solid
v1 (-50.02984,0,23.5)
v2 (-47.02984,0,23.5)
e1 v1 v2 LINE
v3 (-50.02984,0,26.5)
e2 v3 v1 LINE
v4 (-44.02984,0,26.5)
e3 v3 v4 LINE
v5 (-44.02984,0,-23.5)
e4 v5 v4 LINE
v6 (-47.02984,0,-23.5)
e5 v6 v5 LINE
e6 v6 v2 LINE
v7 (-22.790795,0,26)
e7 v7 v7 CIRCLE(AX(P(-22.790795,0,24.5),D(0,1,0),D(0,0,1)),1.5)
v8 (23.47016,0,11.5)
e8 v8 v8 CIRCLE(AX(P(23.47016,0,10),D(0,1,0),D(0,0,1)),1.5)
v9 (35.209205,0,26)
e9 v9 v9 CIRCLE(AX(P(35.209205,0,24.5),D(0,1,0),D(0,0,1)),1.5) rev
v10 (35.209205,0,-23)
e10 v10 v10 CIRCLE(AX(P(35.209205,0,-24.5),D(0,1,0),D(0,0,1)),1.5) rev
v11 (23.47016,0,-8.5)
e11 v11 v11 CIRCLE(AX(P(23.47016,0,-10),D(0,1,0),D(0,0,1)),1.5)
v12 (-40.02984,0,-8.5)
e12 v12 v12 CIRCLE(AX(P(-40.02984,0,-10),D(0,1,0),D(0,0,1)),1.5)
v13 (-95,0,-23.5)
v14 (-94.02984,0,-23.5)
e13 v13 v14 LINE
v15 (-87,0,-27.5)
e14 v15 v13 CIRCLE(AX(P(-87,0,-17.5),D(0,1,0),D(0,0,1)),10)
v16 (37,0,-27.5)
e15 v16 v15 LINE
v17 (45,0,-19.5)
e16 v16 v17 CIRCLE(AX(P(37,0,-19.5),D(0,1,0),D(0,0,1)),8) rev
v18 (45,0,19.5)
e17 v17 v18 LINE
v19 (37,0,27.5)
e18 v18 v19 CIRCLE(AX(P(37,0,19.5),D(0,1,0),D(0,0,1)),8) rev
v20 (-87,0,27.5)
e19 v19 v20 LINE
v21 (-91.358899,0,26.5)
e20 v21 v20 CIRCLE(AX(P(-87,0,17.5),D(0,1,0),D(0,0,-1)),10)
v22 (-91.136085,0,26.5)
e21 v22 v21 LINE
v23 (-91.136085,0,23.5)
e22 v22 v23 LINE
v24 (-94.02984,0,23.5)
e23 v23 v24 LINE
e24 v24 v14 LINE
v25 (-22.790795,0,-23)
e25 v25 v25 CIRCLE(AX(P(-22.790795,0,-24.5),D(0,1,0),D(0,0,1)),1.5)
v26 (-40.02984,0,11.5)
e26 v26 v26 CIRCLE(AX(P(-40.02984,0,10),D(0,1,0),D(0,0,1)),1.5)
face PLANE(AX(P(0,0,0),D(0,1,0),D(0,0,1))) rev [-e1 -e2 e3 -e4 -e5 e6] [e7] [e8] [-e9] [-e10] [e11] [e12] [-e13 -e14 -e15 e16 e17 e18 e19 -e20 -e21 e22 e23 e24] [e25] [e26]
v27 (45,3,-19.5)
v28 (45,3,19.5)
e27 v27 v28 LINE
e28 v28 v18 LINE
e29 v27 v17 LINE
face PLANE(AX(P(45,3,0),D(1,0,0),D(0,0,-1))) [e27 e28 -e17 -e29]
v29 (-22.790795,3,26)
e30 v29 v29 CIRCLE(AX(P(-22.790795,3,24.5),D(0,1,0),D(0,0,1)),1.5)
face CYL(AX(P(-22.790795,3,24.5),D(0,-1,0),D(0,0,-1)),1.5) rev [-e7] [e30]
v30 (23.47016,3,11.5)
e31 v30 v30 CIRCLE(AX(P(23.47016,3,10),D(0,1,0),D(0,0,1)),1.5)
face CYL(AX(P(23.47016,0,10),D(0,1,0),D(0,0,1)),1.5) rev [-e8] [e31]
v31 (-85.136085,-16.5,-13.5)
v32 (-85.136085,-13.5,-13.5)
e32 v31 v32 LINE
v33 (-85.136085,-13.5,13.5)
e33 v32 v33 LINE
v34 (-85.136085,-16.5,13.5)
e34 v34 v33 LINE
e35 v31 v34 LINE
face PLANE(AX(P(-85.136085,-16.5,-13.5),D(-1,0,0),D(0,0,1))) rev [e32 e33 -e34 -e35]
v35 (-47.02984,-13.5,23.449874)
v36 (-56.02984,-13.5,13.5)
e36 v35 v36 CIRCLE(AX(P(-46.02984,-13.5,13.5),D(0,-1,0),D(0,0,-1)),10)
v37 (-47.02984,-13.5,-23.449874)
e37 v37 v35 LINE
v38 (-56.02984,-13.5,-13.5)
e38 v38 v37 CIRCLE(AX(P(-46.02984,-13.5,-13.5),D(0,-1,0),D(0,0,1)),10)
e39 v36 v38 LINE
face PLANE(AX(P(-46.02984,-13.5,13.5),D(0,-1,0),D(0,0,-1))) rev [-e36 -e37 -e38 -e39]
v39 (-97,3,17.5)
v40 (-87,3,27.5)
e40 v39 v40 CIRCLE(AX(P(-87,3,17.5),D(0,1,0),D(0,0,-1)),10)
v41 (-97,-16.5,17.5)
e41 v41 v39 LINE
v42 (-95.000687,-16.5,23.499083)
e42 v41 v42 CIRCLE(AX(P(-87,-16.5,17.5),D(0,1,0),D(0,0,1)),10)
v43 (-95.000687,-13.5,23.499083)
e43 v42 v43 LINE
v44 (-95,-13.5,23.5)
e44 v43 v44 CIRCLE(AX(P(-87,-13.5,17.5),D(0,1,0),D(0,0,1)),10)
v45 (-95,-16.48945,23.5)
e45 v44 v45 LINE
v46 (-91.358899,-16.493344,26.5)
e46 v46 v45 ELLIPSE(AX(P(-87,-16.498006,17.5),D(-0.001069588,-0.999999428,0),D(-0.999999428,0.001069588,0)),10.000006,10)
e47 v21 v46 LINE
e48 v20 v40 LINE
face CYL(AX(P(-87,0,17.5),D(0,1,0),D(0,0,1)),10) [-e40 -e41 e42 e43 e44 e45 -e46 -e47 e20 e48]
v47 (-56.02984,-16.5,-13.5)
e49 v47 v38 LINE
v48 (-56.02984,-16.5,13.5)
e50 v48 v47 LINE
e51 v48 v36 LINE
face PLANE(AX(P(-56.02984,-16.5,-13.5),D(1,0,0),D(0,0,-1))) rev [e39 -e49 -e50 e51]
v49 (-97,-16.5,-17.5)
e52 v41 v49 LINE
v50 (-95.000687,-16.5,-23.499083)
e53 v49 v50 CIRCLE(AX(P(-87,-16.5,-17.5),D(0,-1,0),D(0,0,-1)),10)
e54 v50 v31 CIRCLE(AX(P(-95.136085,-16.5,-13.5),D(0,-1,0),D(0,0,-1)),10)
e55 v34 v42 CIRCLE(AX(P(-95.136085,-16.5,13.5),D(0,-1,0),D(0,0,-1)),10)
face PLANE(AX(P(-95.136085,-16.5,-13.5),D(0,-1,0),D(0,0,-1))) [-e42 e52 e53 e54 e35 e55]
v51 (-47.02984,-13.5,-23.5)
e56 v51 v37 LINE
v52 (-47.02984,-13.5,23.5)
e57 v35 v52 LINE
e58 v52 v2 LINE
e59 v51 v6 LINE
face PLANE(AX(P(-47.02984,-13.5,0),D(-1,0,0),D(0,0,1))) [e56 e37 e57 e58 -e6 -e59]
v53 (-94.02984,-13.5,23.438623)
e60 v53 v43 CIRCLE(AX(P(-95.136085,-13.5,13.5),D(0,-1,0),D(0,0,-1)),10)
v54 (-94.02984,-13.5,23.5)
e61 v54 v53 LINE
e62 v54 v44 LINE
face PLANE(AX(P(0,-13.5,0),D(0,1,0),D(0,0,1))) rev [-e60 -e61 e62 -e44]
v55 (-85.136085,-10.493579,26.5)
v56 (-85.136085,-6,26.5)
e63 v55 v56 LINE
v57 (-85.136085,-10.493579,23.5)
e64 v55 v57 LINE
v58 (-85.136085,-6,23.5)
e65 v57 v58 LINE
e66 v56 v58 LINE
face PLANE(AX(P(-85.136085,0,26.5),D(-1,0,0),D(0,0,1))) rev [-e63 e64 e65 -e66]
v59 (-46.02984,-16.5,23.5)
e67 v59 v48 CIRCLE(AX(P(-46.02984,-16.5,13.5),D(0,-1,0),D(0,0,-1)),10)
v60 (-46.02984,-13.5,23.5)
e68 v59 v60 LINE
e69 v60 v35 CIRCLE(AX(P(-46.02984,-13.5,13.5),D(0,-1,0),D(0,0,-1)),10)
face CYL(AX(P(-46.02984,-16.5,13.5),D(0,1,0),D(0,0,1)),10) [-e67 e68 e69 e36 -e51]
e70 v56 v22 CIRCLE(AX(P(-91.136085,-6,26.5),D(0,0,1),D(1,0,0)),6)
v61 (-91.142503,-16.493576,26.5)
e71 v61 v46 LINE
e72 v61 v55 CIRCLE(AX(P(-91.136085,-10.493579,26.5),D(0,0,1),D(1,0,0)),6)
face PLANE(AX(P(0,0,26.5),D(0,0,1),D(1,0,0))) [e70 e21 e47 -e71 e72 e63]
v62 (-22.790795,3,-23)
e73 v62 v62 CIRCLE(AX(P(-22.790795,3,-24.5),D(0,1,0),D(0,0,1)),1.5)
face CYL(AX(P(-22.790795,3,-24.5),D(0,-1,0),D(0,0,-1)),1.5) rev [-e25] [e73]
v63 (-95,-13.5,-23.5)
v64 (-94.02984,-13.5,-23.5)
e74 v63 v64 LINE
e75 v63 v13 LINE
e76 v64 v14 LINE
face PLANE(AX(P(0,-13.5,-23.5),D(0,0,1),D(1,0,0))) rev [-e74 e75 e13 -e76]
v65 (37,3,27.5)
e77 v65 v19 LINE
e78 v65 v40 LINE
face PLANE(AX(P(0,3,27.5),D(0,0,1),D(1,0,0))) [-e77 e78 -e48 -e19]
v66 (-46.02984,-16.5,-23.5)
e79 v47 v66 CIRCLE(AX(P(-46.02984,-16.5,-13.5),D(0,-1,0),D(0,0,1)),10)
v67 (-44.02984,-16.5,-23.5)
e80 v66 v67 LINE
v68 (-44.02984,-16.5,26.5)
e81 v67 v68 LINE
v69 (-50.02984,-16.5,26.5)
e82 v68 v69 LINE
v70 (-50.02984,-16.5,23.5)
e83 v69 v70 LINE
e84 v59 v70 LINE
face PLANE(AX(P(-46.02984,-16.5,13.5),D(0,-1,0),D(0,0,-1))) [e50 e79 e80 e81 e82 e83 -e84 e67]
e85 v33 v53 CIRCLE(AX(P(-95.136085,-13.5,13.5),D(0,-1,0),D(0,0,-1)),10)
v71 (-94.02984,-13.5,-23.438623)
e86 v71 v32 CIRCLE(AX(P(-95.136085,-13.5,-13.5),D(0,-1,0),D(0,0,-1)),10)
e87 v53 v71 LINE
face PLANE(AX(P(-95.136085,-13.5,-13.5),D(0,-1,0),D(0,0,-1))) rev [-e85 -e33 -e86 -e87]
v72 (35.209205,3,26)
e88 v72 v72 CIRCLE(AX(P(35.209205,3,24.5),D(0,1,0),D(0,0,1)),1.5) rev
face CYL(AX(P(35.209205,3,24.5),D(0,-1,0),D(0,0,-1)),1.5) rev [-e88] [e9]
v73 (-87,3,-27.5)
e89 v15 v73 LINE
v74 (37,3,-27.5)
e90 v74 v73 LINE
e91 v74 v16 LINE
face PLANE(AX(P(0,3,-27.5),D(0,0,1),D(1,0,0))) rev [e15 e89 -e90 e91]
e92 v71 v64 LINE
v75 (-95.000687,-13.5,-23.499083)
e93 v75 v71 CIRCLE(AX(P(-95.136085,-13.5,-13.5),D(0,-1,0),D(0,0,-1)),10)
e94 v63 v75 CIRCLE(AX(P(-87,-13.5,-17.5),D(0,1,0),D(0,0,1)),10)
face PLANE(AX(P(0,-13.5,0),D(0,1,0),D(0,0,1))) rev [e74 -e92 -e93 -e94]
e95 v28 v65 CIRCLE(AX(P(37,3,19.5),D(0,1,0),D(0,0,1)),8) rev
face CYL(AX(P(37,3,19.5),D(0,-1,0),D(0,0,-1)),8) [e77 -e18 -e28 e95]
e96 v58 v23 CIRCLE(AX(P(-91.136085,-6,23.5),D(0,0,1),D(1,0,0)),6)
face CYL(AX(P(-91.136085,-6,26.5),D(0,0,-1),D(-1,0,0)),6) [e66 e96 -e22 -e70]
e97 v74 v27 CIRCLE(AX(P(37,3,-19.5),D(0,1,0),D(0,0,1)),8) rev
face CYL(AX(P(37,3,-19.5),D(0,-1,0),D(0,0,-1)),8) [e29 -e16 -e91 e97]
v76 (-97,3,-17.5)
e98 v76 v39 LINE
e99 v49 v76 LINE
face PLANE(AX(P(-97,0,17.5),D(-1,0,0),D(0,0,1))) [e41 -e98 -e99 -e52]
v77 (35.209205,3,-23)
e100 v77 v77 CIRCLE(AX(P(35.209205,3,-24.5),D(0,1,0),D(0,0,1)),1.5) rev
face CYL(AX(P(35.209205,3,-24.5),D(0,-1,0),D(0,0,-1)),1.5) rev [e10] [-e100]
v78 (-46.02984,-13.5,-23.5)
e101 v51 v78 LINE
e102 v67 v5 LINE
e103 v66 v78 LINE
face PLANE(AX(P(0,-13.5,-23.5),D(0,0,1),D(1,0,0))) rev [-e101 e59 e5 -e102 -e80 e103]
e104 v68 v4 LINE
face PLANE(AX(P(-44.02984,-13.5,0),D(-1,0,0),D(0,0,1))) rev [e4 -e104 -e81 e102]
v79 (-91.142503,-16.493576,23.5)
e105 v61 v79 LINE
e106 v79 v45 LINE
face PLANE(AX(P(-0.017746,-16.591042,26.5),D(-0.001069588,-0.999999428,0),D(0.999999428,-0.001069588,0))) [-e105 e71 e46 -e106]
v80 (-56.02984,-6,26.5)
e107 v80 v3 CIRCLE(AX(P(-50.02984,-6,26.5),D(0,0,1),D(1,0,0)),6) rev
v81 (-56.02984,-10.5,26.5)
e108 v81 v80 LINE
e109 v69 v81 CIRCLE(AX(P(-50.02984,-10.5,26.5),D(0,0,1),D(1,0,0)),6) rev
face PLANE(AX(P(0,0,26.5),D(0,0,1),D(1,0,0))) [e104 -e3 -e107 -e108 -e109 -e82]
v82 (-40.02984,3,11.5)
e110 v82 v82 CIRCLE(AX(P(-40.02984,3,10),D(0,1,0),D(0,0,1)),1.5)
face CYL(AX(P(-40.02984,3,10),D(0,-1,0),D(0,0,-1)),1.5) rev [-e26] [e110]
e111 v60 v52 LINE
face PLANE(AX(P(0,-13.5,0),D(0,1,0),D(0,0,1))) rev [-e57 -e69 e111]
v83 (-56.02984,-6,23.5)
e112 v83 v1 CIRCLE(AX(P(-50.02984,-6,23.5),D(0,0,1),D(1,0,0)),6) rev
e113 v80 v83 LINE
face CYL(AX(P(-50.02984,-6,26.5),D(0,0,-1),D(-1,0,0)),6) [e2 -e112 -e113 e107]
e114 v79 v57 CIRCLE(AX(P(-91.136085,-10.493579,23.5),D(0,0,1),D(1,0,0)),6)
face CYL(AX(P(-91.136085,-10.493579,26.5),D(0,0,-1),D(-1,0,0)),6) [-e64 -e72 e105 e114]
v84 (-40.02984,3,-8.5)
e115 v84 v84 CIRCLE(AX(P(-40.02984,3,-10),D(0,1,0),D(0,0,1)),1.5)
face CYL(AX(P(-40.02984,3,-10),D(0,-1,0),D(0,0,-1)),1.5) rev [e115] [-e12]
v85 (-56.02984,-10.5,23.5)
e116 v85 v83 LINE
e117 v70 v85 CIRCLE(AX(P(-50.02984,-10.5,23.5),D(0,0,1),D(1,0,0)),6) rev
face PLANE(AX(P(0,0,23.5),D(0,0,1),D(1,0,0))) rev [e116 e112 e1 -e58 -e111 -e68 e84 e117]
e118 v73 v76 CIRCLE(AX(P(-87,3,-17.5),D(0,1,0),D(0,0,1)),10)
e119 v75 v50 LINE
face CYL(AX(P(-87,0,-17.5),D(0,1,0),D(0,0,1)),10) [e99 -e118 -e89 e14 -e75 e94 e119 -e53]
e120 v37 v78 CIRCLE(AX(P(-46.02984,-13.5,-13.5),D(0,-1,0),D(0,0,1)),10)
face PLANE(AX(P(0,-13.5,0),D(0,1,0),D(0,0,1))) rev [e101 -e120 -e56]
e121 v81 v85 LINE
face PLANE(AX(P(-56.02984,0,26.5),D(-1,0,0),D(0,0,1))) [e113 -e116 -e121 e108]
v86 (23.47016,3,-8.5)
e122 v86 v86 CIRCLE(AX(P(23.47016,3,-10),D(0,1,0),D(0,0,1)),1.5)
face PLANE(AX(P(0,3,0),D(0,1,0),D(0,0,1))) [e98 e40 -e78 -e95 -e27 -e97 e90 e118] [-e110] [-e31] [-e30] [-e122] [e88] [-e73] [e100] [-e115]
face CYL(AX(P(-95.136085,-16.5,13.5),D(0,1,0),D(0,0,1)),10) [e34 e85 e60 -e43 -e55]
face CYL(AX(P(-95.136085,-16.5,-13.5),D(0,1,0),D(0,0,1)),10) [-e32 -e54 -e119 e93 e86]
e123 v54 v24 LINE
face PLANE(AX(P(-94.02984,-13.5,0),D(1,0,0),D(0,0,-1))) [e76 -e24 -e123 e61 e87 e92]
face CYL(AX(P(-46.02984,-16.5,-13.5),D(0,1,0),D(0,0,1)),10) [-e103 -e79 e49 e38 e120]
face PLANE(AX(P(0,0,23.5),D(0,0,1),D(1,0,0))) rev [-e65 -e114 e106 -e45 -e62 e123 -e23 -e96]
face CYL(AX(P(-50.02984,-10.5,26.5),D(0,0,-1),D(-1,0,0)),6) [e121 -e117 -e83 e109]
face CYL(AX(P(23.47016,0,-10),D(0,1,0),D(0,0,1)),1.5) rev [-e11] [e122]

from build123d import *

# Parameters (mm, degrees)
SKETCH1_R               = 1.5
BOSS_EXTRUDE1_DEPTH     = 3
SKETCH2_R               = 1.5
CUT_EXTRUDE1_DEPTH      = 53.82281704
BOSS_EXTRUDE2_START     = -3
SKETCH3_R               = 1.5
BOSS_EXTRUDE2_DEPTH     = 3
BOSS_EXTRUDE3_START     = -16.5
BOSS_EXTRUDE3_OUTLINE_W = 3
BOSS_EXTRUDE3_OUTLINE_H = 47
BOSS_EXTRUDE3_DEPTH     = 13.5
BOSS_EXTRUDE5_DEPTH     = 3
CUT_EXTRUDE2_DEPTH      = 103.691284927
BOSS_EXTRUDE6_DEPTH     = 3
CUT_EXTRUDE3_DEPTH      = 103.691284927


# Read off the part's stored shape, not the designer's step: Boss-Extrude3
with BuildPart() as part:
    # Sketch1 → Boss-Extrude1 (new body)
    with BuildSketch(Plane(origin=(0, 0, 0), x_dir=(1, 0, 0), z_dir=(0, 1, 0))):
        with BuildLine():
            Line((37, 27.5), (-37, 27.5))
            ThreePointArc((-37, 27.5), (-42.656854249, 25.156854249), (-45, 19.5))
            Line((-45, 19.5), (-45, -19.5))
            ThreePointArc((-45, -19.5), (-42.656854249, -25.156854249), (-37, -27.5))
            Line((-37, -27.5), (37, -27.5))
            ThreePointArc((37, -27.5), (42.656854249, -25.156854249), (45, -19.5))
            Line((45, -19.5), (45, 19.5))
            ThreePointArc((45, 19.5), (42.656854249, 25.156854249), (37, 27.5))
        make_face()
        with Locations(Location((-22.790794979, 24.5, 0), (0, 0, 270))):
            Circle(SKETCH1_R, mode=Mode.SUBTRACT)
        with Locations(Location((-22.790794979, -24.5, 0), (0, 0, 270))):
            Circle(SKETCH1_R, mode=Mode.SUBTRACT)
        with Locations(Location((35.209205021, -24.5, 0), (0, 0, 270))):
            Circle(SKETCH1_R, mode=Mode.SUBTRACT)
        with Locations(Location((35.209205021, 24.5, 0), (0, 0, 270))):
            Circle(SKETCH1_R, mode=Mode.SUBTRACT)
        with Locations(Location((-40.029839799, 10, 0), (0, 0, 270))):
            Circle(SKETCH1_R, mode=Mode.SUBTRACT)
        with Locations(Location((-40.029839799, -10, 0), (0, 0, 270))):
            Circle(SKETCH1_R, mode=Mode.SUBTRACT)
    extrude(amount=BOSS_EXTRUDE1_DEPTH)

    # Sketch2 → Cut-Extrude1 (cut, through all)
    with BuildSketch(Plane(origin=(0, 3, 0), x_dir=(1, 0, 0), z_dir=(0, 1, 0))):
        with Locations(Location((23.470160201, 10, 0), (0, 0, 270))):
            Circle(SKETCH2_R)
        with Locations(Location((23.470160201, -10, 0), (0, 0, 270))):
            Circle(SKETCH2_R)
    extrude(amount=-CUT_EXTRUDE1_DEPTH, mode=Mode.SUBTRACT)

    # Sketch3 → Boss-Extrude2 (add)
    with BuildSketch(Plane(origin=(0, 3, 0), x_dir=(1, 0, 0), z_dir=(0, 1, 0)).offset(BOSS_EXTRUDE2_START)):
        with BuildLine():
            Line((-37, 27.5), (-87, 27.5))
            ThreePointArc((-87, 27.5), (-94.071067812, 24.571067812), (-97, 17.5))
            Line((-97, 17.5), (-97, -17.5))
            ThreePointArc((-97, -17.5), (-94.071067812, -24.571067812), (-87, -27.5))
            Line((-87, -27.5), (-37, -27.5))
            Line((-37, -27.5), (-37, 27.5))
        make_face()
        with Locations(Location((-40.029839799, 10, 0), (0, 0, 270))):
            Circle(SKETCH3_R, mode=Mode.SUBTRACT)
        with Locations(Location((-40.029839799, -10, 0), (0, 0, 270))):
            Circle(SKETCH3_R, mode=Mode.SUBTRACT)
    extrude(amount=BOSS_EXTRUDE2_DEPTH)

    # Boss-Extrude3 outline → Boss-Extrude3 (add)
    with BuildSketch(Plane(origin=(0, 3, 0), x_dir=(1, 0, 0), z_dir=(0, 1, 0)).offset(BOSS_EXTRUDE3_START)):
        with BuildLine():
            Line((-97, 17.5), (-97, -17.5))
            ThreePointArc((-97, -17.5), (-96.486832981, -20.66227766), (-95, -23.5))
            Line((-95, -23.5), (-94.029839799, -23.5))
            Line((-94.029839799, -23.5), (-94.029839799, 23.5))
            Line((-94.029839799, 23.5), (-95, 23.5))
            ThreePointArc((-95, 23.5), (-96.486832981, 20.66227766), (-97, 17.5))
        make_face()
        with Locations((-45.529839799, 0)):
            Rectangle(BOSS_EXTRUDE3_OUTLINE_W, BOSS_EXTRUDE3_OUTLINE_H)
    extrude(amount=BOSS_EXTRUDE3_DEPTH)

    # Sketch6 → Boss-Extrude5 (add)
    with BuildSketch(Plane.XZ.offset(13.5)):
        with BuildLine():
            Line((-44.029839799, 23.5), (-46.029839799, 23.5))
            ThreePointArc((-46.029839799, 23.5), (-53.100907611, 20.571067812), (-56.029839799, 13.5))
            Line((-56.029839799, 13.5), (-56.029839799, -13.5))
            ThreePointArc((-56.029839799, -13.5), (-53.100907611, -20.571067812), (-46.029839799, -23.5))
            Line((-46.029839799, -23.5), (-44.029839799, -23.5))
            Line((-44.029839799, -23.5), (-44.029839799, 23.5))
        make_face()
        with BuildLine():
            Line((-85.136084996, -13.5), (-85.136084996, 13.5))
            ThreePointArc((-85.136084996, 13.5), (-88.065017184, 20.571067812), (-95.136084996, 23.5))
            Line((-95.136084996, 23.5), (-97, 23.5))
            Line((-97, 23.5), (-97, -23.5))
            Line((-97, -23.5), (-95.136084996, -23.5))
            ThreePointArc((-95.136084996, -23.5), (-88.065017184, -20.571067812), (-85.136084996, -13.5))
        make_face()
    extrude(amount=BOSS_EXTRUDE5_DEPTH)

    # Sketch7 → Cut-Extrude2 (cut, through all)
    with BuildSketch(Plane(origin=(0, 3, 0), x_dir=(1, 0, 0), z_dir=(0, 1, 0))):
        with BuildLine():
            Line((-97, 27.5), (-87, 27.5))
            ThreePointArc((-87, 27.5), (-94.071067812, 24.571067812), (-97, 17.5))
            Line((-97, 17.5), (-97, 27.5))
        make_face()
        with BuildLine():
            Line((-97, -27.5), (-97, -17.5))
            ThreePointArc((-97, -17.5), (-94.071067812, -24.571067812), (-87, -27.5))
            Line((-87, -27.5), (-97, -27.5))
        make_face()
    extrude(amount=-CUT_EXTRUDE2_DEPTH, mode=Mode.SUBTRACT)

    # Sketch8 → Boss-Extrude6 (add)
    with BuildSketch(Plane.XY.offset(23.5)):
        with BuildLine():
            Line((-50.029839799, -16.5), (-46.029839799, -16.5))
            Line((-46.029839799, -16.5), (-46.029839799, -13.5))
            Line((-46.029839799, -13.5), (-47.029839799, -13.5))
            Line((-47.029839799, -13.5), (-47.029839799, -6.75))
            Line((-47.029839799, -6.75), (-56.029839799, -6.75))
            Line((-56.029839799, -6.75), (-56.029839799, -10.5))
            ThreePointArc((-56.029839799, -10.5), (-54.272480486, -14.742640687), (-50.029839799, -16.5))
        make_face()
        with BuildLine():
            Line((-47.029839799, -6.75), (-47.029839799, 0))
            Line((-47.029839799, 0), (-50.029839799, 0))
            ThreePointArc((-50.029839799, 0), (-54.272480486, -1.757359313), (-56.029839799, -6))
            Line((-56.029839799, -6), (-56.029839799, -6.75))
            Line((-56.029839799, -6.75), (-47.029839799, -6.75))
        make_face()
        Polygon((-44.029839799, -16.5), (-44.029839799, 0), (-47.029839799, 0), (-47.029839799, -13.5), (-46.029839799, -13.5), (-46.029839799, -16.5), align=None)
        with BuildLine():
            Line((-95, -6.75), (-85.136084996, -6.75))
            Line((-85.136084996, -6.75), (-85.136084996, -6))
            ThreePointArc((-85.136084996, -6), (-86.893444309, -1.757359313), (-91.136084996, 0))
            Line((-91.136084996, 0), (-95, 0))
            Line((-95, 0), (-95, -6.75))
        make_face()
        with BuildLine():
            Line((-85.136084996, -10.493579037), (-85.136084996, -6.75))
            Line((-85.136084996, -6.75), (-95, -6.75))
            Line((-95, -6.75), (-95, -16.48944967))
            Line((-95, -16.48944967), (-91.142502523, -16.493575605))
            ThreePointArc((-91.142502523, -16.493575605), (-86.895713854, -14.738488056), (-85.136084996, -10.493579037))
        make_face()
    extrude(amount=BOSS_EXTRUDE6_DEPTH)

    # Sketch9 → Cut-Extrude3 (cut, through all)
    with BuildSketch(Plane(origin=(0, 3, 0), x_dir=(1, 0, 0), z_dir=(0, 1, 0))):
        with BuildLine():
            Line((-97, -17.5), (-97, -27.5))
            Line((-97, -27.5), (-87, -27.5))
            ThreePointArc((-87, -27.5), (-94.071067812, -24.571067812), (-97, -17.5))
        make_face()
    extrude(amount=-CUT_EXTRUDE3_DEPTH, mode=Mode.SUBTRACT)


solid = part.part
